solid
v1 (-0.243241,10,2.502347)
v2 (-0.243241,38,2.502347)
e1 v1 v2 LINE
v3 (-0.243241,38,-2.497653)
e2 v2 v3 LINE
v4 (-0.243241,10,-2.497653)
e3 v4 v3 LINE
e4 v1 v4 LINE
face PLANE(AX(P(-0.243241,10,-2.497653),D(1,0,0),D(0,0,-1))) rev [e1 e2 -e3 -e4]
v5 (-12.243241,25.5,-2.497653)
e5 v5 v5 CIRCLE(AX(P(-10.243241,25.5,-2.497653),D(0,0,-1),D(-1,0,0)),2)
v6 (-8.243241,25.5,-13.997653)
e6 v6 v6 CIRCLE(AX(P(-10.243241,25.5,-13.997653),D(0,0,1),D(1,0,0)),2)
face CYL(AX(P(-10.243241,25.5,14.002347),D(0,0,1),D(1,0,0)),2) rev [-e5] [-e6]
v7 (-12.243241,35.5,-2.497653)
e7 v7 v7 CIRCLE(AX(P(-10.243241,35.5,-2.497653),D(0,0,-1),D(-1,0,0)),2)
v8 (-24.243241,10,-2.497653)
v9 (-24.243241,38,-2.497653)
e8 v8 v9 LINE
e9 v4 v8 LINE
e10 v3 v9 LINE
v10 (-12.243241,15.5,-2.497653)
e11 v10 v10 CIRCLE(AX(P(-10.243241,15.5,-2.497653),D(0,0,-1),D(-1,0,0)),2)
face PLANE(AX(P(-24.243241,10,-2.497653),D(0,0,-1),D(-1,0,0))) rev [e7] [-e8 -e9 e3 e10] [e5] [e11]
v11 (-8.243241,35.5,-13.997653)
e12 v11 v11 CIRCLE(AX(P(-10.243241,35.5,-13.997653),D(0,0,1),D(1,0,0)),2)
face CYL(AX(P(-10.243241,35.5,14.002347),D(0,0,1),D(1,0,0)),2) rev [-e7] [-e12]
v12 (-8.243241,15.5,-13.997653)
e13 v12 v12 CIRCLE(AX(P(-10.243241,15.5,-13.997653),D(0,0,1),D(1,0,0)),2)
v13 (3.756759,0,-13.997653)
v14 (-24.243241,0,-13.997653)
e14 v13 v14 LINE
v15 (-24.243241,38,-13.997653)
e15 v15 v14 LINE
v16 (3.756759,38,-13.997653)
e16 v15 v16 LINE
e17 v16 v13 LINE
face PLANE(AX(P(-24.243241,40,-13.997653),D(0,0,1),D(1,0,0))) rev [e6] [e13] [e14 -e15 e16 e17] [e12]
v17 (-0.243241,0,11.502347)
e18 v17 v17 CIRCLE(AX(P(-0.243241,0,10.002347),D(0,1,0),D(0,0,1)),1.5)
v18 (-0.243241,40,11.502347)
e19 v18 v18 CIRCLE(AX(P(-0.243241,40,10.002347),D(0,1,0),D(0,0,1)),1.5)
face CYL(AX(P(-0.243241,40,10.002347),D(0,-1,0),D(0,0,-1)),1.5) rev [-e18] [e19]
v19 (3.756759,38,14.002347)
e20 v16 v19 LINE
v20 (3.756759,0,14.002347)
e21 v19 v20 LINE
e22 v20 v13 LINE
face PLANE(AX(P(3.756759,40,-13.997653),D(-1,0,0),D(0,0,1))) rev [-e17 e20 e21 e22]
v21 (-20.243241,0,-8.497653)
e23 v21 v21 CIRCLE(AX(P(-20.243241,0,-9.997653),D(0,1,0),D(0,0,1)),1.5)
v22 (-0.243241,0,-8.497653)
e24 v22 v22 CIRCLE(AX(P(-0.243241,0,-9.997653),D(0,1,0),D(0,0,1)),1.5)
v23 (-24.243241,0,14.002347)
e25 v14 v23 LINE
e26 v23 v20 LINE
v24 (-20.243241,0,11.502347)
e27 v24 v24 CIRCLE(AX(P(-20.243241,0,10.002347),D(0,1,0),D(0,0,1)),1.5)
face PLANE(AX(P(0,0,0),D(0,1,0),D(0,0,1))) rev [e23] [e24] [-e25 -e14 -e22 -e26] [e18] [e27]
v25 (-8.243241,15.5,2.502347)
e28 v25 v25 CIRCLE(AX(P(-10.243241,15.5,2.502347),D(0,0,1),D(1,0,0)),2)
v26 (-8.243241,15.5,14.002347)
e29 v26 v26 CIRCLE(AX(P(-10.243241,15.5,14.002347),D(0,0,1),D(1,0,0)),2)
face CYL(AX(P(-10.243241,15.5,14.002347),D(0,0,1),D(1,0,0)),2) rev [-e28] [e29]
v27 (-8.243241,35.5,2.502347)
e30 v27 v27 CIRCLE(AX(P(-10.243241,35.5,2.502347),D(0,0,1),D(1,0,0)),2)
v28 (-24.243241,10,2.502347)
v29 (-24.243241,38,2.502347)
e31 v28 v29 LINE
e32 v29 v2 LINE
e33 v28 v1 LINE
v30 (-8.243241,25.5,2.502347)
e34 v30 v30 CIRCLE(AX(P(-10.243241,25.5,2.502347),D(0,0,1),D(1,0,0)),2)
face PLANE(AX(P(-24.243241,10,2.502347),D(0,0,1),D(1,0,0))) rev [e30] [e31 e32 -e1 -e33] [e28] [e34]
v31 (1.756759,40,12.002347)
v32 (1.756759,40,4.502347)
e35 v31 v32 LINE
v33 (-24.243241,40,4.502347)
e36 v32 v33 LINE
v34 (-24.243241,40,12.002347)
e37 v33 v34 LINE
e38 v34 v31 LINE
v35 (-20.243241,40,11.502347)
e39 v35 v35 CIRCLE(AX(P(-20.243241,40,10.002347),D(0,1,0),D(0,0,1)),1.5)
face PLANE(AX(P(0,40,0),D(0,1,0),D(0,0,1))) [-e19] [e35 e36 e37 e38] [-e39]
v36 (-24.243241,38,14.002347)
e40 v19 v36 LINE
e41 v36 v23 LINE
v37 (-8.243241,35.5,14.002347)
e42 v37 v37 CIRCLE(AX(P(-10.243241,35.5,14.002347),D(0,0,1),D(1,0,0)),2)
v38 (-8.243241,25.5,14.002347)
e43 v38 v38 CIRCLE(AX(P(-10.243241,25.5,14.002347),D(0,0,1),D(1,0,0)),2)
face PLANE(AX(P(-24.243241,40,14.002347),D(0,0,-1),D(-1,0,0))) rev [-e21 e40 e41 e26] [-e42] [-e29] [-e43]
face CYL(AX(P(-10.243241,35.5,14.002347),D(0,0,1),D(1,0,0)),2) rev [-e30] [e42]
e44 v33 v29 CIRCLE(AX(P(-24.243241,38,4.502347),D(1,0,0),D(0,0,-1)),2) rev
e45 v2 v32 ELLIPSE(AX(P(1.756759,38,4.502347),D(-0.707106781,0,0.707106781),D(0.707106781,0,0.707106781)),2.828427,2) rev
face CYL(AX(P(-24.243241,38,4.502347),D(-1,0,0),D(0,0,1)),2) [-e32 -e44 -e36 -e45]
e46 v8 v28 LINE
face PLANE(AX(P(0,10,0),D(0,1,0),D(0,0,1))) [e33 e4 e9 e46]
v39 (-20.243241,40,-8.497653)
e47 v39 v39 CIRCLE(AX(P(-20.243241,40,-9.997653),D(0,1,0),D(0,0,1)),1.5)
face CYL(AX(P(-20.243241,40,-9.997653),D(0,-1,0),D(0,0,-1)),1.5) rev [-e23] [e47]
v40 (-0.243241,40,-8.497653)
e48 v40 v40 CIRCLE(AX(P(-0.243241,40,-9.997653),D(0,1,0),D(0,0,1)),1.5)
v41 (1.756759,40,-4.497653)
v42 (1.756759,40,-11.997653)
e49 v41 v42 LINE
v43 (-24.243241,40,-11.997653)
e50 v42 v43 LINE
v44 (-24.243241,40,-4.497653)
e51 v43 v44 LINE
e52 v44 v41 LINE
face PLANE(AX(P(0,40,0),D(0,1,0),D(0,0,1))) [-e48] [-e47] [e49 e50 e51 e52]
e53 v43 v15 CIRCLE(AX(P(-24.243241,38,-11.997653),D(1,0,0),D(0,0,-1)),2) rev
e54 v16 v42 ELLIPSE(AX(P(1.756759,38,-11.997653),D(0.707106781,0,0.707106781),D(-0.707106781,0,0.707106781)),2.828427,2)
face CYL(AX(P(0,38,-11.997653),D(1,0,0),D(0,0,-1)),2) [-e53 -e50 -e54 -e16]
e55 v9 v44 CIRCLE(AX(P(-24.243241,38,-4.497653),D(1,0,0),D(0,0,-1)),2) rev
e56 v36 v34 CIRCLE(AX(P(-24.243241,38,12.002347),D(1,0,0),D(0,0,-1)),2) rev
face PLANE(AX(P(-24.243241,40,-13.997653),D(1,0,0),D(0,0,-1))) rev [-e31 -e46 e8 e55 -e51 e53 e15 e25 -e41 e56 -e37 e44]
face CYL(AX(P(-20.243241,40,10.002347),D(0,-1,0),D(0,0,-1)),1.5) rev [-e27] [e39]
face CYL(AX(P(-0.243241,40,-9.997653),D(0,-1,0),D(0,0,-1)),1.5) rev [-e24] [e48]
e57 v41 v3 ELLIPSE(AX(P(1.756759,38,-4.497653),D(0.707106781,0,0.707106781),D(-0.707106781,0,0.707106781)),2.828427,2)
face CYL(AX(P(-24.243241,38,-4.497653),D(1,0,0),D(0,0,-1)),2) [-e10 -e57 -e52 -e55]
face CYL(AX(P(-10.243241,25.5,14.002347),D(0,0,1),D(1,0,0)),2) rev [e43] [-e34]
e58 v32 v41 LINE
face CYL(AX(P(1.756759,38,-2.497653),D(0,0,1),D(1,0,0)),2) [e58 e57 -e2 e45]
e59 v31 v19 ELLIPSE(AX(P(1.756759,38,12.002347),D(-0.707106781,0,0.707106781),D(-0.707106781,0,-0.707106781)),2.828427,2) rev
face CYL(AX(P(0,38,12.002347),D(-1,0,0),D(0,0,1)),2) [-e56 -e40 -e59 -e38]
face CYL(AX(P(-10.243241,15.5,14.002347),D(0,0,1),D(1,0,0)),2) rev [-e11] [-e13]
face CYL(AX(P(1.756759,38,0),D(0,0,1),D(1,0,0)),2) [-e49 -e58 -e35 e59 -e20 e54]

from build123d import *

# Parameters (mm, degrees)
SKIZZE2_W                       = 28
SKIZZE2_H                       = 28
SKIZZE2_R                       = 1.5
AUFSATZ_LINEAR_AUSTRAGEN1_DEPTH = 40
SKIZZE3_W                       = 24
SKIZZE3_H                       = 5
SCHNITT_LINEAR_AUSTRAGEN1_DEPTH = 30
F_4_0_4_DURCHMESSER_BOHRUNG1_D  = 4
VERRUNDUNG1_R                   = 2


with BuildPart() as part:
    # Skizze2 → Aufsatz-Linear austragen1 (new body)
    with BuildSketch(Plane(origin=(0, 0, 0), x_dir=(1, 0, 0), z_dir=(0, 1, 0))):
        with Locations((-10.243240712, -0.002346974)):
            Rectangle(SKIZZE2_W, SKIZZE2_H)
        with Locations(Location((-20.243240712, 9.997653026, 0), (0, 0, 270))):
            Circle(SKIZZE2_R, mode=Mode.SUBTRACT)
        with Locations(Location((-0.243240712, 9.997653026, 0), (0, 0, 270))):
            Circle(SKIZZE2_R, mode=Mode.SUBTRACT)
        with Locations(Location((-20.243240712, -10.002346974, 0), (0, 0, 270))):
            Circle(SKIZZE2_R, mode=Mode.SUBTRACT)
        with Locations(Location((-0.243240712, -10.002346974, 0), (0, 0, 270))):
            Circle(SKIZZE2_R, mode=Mode.SUBTRACT)
    extrude(amount=AUFSATZ_LINEAR_AUSTRAGEN1_DEPTH)

    # Skizze3 → Schnitt-Linear austragen1 (cut)
    with BuildSketch(Plane(origin=(0, 40, 0), x_dir=(1, 0, 0), z_dir=(0, 1, 0))):
        with Locations((-12.243240712, -0.002346974)):
            Rectangle(SKIZZE3_W, SKIZZE3_H)
    extrude(amount=-SCHNITT_LINEAR_AUSTRAGEN1_DEPTH, mode=Mode.SUBTRACT)

    # Ø4.0 (4) Durchmesser Bohrung1 (through all)
    with Locations(Plane.XY.offset(14.002346974)):
        with Locations((-10.243240712, 15.5), (-10.243240712, 35.5), (-10.243240712, 25.5)):
            Hole(F_4_0_4_DURCHMESSER_BOHRUNG1_D / 2)

    # Verrundung1
    verrundung1_edges = [part.edges().sort_by_distance(p)[0] for p in [
        (3.756759288, 40, 0.002346974),
        (-10.243240712, 40, -13.997653026),
        (-12.243240712, 40, 2.502346974),
        (-0.243240712, 40, 0.002346974),
        (-12.243240712, 40, -2.497653026),
        (-10.243240712, 40, 14.002346974),
    ]]
    fillet(verrundung1_edges, radius=VERRUNDUNG1_R - 0.0001)  # a hair under: the kernel refuses the full size


solid = part.part
